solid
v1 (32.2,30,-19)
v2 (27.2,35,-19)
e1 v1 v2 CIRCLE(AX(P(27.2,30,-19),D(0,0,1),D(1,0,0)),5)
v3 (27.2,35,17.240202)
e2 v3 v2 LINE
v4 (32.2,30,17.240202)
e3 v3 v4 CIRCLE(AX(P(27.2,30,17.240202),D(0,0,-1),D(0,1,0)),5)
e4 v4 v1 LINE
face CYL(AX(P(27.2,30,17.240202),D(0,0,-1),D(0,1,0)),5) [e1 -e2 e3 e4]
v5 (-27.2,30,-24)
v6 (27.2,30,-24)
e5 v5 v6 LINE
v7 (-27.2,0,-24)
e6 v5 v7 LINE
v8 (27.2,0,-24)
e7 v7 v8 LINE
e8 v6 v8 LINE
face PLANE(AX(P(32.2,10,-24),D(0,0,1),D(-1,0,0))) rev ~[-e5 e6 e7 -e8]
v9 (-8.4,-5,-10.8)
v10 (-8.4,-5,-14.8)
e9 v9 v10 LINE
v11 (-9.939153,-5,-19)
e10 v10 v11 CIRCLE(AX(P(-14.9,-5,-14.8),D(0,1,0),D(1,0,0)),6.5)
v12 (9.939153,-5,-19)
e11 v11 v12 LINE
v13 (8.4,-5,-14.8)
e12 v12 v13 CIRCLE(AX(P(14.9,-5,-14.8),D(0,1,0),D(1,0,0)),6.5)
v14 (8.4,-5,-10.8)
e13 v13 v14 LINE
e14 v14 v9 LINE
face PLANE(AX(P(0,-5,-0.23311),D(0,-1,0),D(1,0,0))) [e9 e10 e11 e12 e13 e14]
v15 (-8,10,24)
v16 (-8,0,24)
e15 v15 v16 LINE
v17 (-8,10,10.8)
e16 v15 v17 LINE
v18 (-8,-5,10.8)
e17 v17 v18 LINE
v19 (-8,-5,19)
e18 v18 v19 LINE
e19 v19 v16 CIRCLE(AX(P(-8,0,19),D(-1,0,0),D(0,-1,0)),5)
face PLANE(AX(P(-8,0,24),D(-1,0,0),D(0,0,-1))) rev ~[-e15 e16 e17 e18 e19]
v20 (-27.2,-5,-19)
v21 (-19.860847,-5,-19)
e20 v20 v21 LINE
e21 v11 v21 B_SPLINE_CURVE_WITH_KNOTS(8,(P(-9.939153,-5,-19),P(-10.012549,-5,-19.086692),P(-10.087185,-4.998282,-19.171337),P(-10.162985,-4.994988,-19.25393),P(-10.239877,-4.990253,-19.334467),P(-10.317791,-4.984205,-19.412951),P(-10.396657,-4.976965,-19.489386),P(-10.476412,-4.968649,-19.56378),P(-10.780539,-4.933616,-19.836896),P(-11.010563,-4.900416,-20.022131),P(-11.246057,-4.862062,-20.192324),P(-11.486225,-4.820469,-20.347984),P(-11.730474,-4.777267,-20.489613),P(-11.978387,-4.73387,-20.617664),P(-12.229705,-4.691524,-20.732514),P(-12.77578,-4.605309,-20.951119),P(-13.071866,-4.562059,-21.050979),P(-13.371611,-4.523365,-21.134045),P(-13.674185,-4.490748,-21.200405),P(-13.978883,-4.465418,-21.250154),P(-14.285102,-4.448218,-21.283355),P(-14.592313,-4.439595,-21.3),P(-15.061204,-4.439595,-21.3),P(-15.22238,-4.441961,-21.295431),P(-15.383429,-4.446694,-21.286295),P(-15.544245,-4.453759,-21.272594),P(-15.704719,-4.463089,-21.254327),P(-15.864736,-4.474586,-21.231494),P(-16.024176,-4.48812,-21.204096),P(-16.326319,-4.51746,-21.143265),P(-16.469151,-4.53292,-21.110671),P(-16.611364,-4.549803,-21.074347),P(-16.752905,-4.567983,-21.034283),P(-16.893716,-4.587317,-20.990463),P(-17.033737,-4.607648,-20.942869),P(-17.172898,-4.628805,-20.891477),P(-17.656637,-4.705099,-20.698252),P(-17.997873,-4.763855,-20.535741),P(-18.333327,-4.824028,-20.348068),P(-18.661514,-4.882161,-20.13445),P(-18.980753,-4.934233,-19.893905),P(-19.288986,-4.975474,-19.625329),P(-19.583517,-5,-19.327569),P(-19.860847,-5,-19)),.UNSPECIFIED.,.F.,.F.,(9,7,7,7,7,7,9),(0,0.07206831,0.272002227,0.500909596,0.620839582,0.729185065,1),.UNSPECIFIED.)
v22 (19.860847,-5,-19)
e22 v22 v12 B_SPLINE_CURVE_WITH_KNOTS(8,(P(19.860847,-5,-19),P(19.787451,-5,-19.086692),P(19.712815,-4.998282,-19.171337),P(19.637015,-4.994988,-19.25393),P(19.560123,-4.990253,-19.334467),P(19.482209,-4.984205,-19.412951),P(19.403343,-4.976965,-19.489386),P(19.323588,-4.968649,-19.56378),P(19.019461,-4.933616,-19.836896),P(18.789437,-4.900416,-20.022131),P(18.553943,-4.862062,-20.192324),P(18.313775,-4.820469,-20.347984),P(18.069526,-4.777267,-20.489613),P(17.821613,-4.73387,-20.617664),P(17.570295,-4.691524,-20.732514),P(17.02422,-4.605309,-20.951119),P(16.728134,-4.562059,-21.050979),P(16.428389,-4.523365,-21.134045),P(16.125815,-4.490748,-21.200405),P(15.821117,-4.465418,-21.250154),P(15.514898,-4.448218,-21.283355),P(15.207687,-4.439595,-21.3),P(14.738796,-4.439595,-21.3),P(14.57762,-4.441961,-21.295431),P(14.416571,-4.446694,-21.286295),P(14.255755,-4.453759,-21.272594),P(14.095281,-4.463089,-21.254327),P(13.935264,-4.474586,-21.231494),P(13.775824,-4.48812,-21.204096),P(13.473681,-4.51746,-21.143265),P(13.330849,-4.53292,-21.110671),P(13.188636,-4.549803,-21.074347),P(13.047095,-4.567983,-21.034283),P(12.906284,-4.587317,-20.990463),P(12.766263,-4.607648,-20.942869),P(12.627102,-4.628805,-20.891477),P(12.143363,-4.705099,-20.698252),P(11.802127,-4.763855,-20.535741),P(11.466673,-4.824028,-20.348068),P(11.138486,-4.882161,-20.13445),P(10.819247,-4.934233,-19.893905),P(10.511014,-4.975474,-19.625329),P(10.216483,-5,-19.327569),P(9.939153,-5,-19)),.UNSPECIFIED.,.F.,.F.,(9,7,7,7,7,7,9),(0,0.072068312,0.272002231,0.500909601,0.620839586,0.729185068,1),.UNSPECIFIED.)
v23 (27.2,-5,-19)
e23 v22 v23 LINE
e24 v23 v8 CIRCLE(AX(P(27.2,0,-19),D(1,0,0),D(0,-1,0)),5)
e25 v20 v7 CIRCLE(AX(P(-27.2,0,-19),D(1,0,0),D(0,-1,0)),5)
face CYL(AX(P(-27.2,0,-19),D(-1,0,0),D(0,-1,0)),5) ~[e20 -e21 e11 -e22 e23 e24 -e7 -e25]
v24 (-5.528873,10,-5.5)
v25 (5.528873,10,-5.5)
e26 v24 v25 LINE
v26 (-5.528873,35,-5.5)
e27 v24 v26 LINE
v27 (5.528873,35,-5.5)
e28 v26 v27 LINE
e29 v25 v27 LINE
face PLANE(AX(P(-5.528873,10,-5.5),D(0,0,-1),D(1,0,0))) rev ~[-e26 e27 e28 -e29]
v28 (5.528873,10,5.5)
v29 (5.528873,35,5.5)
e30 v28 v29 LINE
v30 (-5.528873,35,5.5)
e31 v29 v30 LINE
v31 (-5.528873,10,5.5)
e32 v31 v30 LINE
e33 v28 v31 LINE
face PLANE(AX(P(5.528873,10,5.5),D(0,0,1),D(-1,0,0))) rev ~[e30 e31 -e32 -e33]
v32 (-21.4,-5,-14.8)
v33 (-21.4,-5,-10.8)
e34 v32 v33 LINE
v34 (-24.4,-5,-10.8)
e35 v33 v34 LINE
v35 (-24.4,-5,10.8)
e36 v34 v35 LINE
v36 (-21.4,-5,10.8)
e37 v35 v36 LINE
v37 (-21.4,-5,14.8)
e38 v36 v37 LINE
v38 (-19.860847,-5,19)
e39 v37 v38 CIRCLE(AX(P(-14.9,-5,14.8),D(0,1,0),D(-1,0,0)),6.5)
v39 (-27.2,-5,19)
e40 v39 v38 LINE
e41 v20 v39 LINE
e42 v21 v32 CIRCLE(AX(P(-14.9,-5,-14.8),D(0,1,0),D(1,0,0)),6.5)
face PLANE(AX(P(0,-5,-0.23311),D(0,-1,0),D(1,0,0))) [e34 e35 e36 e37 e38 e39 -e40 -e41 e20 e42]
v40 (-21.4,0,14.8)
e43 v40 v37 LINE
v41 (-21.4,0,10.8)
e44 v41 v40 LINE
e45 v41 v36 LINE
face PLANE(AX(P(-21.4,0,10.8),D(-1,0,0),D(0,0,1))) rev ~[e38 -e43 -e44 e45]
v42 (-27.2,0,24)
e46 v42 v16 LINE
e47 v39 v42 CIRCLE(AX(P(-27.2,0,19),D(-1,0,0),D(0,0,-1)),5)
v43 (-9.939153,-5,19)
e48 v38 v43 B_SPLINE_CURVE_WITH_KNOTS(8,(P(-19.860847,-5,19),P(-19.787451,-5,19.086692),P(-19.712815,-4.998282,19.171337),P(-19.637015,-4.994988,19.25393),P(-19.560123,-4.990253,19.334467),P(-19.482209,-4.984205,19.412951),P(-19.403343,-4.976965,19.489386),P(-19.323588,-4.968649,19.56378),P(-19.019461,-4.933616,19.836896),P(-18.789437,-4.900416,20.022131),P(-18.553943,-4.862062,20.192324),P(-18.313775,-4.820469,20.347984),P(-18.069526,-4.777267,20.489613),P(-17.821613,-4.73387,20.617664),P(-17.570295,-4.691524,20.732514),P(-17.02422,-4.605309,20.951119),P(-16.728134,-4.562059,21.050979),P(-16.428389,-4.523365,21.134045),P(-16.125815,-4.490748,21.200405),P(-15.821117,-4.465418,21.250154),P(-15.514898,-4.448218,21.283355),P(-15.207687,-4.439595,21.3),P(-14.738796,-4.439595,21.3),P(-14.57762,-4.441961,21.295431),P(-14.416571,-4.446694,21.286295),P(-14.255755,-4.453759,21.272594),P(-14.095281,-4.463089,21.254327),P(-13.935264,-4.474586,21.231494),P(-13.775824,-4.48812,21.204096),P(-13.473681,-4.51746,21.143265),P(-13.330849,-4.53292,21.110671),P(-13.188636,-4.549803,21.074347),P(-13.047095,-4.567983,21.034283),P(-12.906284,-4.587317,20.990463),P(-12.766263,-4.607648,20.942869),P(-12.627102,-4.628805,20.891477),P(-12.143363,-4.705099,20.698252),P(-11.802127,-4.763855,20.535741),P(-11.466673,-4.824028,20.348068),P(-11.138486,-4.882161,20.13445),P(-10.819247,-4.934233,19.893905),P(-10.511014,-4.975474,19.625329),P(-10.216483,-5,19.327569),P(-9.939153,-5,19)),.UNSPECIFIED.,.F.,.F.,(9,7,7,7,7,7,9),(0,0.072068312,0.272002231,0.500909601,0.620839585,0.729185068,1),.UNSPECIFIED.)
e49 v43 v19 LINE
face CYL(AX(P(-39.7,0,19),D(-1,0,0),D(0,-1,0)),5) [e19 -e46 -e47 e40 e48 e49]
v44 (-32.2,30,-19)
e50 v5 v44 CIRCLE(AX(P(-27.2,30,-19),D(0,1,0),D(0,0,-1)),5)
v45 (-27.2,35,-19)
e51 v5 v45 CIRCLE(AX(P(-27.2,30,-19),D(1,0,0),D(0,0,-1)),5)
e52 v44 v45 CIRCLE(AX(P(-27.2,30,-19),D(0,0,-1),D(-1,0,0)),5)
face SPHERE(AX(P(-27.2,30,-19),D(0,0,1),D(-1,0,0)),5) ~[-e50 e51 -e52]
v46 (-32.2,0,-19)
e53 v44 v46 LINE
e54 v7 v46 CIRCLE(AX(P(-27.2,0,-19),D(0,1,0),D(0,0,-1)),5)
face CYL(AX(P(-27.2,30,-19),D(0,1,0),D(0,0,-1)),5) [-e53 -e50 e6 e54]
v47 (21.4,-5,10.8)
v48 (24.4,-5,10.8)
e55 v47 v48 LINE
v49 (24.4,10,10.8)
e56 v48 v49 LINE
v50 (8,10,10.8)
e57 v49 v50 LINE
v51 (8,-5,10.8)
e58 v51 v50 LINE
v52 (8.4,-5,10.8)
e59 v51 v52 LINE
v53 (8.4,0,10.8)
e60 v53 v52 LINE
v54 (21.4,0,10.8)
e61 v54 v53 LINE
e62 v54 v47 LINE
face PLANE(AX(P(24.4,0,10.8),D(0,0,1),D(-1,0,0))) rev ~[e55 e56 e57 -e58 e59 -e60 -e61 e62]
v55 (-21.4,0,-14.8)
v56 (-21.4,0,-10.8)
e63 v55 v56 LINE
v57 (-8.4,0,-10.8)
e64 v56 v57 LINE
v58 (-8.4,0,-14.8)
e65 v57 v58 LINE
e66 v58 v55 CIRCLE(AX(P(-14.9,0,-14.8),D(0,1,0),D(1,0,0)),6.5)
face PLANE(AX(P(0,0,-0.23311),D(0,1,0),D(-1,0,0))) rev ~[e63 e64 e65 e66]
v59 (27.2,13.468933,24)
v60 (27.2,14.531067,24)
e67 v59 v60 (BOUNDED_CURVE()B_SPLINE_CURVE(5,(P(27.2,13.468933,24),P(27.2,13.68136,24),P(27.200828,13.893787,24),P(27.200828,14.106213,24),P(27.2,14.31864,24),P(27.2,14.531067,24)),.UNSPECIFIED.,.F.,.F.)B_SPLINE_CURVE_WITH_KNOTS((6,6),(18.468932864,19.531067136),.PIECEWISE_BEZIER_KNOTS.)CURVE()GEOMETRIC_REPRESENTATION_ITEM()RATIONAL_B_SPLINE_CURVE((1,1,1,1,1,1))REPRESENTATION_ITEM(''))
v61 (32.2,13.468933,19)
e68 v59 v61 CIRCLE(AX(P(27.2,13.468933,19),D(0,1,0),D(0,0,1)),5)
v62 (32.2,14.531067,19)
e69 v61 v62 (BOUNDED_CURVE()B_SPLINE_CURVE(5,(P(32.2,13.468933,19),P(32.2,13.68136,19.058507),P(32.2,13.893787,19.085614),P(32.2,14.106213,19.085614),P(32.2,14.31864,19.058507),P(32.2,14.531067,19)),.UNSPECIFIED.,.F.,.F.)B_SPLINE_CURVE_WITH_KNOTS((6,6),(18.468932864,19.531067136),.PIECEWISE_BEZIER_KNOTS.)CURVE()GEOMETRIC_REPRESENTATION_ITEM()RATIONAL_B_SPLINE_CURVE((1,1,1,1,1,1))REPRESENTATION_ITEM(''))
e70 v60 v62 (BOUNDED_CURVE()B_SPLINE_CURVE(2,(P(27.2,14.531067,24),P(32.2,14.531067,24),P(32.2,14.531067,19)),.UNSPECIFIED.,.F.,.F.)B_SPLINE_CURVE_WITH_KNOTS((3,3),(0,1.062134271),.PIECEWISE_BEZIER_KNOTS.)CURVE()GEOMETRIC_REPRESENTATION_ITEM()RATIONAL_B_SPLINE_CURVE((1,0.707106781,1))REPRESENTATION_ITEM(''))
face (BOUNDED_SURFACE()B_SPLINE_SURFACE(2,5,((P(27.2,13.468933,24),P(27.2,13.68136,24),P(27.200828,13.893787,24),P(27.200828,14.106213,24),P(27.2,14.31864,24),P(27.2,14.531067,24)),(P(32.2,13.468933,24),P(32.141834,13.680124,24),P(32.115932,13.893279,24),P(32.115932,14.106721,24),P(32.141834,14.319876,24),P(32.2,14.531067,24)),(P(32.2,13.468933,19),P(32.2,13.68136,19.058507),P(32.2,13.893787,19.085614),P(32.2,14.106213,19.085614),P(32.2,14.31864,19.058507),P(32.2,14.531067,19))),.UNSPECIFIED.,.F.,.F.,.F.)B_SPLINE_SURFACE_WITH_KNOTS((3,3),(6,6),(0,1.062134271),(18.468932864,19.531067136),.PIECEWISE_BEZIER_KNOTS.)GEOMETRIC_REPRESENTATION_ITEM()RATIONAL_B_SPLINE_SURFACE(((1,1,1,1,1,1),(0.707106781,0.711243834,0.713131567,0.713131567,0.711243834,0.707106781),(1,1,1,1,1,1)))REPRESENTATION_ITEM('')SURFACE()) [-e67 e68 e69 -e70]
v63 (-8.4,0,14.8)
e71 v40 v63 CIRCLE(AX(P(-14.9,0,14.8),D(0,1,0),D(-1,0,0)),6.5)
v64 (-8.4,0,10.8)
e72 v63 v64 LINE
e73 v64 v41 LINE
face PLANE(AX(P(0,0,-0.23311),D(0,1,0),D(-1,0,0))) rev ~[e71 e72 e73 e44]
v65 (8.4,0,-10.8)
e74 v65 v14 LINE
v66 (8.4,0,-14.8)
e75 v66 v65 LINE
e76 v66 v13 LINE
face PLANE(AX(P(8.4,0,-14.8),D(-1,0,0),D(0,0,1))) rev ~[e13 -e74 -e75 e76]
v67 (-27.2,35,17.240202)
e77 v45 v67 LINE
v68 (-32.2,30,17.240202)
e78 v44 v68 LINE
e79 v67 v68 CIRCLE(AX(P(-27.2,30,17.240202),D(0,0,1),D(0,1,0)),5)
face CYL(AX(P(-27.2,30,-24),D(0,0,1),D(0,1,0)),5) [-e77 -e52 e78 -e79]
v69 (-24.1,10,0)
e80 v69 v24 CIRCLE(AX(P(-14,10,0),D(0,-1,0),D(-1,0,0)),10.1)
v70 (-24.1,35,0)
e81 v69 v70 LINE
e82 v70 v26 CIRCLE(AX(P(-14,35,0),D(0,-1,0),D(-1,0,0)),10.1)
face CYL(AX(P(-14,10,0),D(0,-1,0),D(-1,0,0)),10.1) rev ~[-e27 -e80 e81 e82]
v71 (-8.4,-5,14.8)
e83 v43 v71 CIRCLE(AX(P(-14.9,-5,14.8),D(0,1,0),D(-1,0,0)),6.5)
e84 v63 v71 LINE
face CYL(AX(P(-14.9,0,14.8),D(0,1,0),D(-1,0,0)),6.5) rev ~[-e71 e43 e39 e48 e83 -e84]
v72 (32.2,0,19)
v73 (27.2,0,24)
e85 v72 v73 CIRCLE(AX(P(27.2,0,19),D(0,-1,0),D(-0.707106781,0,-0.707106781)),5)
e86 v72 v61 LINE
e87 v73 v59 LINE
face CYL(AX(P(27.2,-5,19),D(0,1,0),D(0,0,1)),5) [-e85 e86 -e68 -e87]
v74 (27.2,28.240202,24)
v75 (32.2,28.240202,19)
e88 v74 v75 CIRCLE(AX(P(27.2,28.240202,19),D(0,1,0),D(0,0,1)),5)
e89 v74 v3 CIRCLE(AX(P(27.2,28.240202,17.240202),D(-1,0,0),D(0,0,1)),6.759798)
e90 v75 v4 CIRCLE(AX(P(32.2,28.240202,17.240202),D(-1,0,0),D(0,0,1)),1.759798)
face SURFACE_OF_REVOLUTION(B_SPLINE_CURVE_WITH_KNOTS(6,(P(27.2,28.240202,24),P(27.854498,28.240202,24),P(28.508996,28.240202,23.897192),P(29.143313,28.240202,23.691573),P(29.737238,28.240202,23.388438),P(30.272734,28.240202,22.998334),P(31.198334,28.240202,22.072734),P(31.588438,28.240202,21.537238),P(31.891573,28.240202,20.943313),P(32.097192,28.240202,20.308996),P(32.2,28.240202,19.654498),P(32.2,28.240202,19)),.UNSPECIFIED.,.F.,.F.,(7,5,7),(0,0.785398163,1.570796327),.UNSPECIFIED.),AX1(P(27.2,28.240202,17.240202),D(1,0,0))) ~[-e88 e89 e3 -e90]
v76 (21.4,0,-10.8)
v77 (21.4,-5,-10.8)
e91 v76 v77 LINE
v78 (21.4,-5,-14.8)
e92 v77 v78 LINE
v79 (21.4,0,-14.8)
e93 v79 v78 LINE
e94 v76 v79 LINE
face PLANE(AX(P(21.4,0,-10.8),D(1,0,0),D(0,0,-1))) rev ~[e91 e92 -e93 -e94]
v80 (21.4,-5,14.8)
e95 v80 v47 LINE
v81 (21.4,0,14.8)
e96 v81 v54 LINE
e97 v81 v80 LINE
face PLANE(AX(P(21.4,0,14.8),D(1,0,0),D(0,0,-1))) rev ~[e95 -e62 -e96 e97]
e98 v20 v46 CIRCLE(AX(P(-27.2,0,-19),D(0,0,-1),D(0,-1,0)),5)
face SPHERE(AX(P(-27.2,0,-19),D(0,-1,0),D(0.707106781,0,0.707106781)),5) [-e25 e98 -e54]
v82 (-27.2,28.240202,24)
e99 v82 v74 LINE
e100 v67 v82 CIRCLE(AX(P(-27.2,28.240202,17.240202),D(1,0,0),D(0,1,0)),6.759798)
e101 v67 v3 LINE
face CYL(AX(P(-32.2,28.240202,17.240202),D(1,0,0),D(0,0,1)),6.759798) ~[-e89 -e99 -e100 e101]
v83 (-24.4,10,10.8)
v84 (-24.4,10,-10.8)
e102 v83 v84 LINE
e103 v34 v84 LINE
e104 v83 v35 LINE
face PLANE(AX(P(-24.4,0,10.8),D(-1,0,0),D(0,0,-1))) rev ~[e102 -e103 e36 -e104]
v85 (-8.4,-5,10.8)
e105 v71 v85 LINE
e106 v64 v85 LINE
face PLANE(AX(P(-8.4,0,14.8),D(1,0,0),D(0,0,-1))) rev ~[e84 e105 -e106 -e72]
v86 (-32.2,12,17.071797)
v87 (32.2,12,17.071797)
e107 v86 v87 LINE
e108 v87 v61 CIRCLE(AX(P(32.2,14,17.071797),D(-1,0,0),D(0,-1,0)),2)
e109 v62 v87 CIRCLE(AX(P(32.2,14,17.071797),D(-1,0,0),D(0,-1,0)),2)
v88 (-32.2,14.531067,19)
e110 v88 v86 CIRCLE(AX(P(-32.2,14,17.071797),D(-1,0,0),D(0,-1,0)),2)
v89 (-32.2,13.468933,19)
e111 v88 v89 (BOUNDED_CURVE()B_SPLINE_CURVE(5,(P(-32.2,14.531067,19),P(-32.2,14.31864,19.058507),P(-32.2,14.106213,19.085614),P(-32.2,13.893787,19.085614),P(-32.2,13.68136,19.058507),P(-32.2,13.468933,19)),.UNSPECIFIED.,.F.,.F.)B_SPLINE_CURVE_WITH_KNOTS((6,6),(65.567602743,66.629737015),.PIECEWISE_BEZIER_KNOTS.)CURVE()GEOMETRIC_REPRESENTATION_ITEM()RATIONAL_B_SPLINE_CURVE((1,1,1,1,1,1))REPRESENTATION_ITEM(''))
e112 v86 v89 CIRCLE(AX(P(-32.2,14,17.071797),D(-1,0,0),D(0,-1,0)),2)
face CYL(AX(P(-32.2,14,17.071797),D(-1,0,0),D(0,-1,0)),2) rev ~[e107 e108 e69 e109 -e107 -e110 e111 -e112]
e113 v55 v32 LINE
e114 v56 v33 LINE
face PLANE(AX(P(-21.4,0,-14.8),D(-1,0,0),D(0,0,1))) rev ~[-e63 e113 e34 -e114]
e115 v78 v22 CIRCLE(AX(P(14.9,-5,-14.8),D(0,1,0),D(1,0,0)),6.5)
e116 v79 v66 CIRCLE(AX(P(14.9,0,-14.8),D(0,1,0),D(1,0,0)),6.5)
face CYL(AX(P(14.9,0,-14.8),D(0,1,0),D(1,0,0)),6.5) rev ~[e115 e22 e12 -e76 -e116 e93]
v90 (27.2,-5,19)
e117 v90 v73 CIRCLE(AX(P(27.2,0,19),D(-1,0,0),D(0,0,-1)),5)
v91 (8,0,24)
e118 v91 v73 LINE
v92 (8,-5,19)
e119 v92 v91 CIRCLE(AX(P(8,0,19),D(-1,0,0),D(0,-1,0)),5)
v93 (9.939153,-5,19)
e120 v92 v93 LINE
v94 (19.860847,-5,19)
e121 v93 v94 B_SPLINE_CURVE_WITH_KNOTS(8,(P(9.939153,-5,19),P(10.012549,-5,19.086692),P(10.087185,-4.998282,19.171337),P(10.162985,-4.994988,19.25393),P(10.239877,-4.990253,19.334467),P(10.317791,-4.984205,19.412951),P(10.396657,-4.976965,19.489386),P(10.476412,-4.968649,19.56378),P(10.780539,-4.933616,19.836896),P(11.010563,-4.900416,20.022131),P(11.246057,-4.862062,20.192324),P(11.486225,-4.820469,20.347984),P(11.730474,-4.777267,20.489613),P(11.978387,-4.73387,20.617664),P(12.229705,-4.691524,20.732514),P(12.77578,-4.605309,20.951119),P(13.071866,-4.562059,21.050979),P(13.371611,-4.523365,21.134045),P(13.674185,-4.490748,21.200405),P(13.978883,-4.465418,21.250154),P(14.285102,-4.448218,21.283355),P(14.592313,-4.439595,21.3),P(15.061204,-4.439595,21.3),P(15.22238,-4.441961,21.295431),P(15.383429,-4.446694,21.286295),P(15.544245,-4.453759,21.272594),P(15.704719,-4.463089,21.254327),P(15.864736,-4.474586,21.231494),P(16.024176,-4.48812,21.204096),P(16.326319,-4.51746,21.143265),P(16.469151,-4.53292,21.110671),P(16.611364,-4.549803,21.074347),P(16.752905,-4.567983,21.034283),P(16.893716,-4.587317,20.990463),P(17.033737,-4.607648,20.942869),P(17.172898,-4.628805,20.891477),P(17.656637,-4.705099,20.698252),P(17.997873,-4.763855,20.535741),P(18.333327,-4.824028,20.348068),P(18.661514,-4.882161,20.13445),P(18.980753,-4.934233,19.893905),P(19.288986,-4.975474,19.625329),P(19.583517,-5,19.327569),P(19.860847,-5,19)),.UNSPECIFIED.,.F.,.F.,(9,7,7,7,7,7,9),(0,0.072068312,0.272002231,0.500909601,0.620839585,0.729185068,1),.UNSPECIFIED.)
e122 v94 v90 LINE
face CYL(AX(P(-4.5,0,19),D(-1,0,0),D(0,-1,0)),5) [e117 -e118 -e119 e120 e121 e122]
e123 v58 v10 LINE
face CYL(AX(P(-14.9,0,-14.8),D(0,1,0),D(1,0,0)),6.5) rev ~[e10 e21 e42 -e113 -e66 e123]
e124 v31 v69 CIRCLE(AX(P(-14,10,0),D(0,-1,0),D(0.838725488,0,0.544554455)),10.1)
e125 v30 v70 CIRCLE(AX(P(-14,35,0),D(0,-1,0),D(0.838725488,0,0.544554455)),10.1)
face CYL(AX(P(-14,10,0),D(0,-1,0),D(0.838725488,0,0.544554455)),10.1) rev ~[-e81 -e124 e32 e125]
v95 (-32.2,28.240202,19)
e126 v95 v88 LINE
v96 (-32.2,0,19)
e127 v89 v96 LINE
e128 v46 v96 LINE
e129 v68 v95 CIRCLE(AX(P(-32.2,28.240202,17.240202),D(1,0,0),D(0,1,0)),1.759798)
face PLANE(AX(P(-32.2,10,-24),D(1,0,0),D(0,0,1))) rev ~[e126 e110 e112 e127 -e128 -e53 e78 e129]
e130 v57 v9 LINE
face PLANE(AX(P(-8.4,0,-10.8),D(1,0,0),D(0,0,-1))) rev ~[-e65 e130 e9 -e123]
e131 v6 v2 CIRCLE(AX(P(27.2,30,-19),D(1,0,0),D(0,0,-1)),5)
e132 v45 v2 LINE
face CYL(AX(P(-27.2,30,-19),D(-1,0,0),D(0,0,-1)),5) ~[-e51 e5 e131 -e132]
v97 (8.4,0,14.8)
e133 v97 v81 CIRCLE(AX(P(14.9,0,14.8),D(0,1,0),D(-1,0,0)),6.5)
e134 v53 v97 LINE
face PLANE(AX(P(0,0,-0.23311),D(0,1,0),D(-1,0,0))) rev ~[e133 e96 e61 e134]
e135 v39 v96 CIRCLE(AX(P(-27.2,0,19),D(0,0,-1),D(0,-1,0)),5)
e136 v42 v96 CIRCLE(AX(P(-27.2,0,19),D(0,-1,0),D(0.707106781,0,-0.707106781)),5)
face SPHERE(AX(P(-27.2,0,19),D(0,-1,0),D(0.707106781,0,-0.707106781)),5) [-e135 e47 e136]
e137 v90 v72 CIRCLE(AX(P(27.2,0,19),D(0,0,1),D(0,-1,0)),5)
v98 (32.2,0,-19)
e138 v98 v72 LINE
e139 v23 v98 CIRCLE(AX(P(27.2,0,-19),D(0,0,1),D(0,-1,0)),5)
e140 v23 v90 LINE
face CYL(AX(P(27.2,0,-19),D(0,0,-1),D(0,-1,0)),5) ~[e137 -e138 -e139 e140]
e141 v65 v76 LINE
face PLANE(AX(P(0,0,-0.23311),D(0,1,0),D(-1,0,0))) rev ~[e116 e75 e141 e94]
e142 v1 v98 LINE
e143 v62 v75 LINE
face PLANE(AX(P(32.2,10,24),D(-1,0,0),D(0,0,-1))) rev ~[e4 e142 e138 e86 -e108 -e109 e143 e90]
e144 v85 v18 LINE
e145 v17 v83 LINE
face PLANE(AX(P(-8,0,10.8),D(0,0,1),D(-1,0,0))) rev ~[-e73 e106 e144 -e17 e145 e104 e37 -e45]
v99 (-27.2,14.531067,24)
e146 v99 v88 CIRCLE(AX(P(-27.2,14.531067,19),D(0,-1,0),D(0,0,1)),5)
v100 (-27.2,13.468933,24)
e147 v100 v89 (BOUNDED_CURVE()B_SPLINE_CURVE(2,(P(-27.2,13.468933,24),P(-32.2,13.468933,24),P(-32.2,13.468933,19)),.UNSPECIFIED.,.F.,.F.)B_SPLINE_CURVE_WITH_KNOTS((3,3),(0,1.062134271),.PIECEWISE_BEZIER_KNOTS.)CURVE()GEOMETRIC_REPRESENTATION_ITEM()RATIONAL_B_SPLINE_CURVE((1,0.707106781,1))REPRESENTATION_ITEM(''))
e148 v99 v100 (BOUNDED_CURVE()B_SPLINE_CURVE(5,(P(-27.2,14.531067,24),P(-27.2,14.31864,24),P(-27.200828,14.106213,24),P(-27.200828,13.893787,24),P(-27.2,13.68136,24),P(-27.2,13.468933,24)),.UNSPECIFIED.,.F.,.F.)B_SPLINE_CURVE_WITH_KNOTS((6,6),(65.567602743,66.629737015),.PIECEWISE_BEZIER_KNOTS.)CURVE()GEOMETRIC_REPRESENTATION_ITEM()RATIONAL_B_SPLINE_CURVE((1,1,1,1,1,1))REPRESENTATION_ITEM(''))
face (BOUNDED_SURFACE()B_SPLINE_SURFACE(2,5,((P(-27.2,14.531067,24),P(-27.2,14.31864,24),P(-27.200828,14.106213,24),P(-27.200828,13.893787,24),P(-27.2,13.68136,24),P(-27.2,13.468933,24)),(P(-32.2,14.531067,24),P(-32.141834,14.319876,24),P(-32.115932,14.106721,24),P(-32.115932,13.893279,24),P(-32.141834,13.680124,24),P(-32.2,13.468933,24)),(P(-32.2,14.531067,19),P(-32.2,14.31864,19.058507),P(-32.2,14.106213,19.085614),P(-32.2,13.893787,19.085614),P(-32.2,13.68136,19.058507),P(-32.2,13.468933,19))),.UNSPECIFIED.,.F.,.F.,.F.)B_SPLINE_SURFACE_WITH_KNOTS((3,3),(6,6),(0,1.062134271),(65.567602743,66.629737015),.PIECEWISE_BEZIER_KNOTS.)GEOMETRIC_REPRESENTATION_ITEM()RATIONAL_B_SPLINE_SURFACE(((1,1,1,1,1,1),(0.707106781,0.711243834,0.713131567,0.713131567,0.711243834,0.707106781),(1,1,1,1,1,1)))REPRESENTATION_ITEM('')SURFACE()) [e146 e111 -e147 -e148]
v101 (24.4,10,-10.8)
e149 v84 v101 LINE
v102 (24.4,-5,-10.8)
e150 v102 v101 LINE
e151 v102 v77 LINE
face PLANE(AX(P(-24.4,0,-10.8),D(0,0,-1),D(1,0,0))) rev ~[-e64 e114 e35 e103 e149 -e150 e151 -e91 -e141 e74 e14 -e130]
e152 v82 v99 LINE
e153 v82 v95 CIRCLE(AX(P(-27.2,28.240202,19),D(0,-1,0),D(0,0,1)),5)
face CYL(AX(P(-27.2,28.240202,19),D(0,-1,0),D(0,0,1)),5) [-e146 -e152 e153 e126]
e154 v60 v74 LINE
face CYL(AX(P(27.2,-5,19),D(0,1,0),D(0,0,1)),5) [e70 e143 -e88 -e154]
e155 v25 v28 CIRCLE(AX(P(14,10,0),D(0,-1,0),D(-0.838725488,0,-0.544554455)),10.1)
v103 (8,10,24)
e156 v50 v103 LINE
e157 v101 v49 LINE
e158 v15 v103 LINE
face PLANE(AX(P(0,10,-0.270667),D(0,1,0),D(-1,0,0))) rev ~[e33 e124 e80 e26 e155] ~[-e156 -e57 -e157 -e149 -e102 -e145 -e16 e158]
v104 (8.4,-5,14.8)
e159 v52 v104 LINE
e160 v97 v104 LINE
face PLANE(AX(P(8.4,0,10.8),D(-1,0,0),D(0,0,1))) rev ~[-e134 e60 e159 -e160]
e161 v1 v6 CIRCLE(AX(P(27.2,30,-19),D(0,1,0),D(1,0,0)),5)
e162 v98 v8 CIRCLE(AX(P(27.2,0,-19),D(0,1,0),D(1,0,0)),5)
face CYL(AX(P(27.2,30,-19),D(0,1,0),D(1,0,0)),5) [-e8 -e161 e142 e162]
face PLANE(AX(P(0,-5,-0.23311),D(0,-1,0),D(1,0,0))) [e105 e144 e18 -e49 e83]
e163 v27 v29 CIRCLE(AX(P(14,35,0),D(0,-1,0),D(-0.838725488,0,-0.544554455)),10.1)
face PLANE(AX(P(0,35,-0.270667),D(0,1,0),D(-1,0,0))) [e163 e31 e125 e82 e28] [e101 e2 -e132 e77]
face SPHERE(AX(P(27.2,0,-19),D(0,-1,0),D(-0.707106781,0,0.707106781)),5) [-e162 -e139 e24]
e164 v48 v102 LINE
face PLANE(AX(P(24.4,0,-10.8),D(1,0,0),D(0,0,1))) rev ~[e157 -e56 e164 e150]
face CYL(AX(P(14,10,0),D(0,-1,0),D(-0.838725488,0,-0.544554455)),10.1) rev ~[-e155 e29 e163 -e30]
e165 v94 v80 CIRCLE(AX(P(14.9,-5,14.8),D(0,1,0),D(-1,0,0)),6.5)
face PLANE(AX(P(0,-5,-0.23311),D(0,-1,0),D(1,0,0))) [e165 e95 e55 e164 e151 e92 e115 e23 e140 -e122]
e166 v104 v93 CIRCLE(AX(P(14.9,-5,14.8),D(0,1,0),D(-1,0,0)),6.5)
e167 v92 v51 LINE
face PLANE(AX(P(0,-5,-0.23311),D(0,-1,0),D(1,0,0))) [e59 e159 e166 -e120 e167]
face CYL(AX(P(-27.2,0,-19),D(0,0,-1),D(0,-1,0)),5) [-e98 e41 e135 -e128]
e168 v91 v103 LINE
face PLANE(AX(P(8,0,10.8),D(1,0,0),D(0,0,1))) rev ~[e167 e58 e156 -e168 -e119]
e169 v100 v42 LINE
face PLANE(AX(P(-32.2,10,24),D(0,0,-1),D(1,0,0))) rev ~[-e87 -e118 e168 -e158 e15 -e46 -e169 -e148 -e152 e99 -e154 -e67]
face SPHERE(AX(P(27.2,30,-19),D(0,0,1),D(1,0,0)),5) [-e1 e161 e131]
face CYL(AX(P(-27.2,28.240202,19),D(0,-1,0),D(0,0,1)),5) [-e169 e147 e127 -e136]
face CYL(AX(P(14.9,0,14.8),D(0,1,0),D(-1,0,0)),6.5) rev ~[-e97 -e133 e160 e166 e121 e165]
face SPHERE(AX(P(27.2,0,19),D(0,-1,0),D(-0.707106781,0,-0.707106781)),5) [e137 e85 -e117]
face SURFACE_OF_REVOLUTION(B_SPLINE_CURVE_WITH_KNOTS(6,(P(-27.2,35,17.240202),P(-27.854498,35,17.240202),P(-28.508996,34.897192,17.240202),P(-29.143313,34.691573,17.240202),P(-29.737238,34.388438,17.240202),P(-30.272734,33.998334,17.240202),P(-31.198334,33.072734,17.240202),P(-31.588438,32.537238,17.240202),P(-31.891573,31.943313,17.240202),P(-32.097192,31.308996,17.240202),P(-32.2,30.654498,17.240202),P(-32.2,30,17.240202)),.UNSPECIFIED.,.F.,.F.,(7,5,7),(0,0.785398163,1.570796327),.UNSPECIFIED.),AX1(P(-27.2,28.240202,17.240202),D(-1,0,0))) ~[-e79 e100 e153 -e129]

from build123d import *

# Parameters (mm, degrees)
F1_DEPTH      = 5
F3_DEPTH      = 10
F5_DEPTH      = 25
F7_R          = 6.7597979746
F6_R          = 2
F8_DEPTH      = 69.4
F9_R          = 5
F10_R         = 5
F11_T1_DEPTH  = 44.2
F11_T3_DEPTH  = 44.2
F12_T1_DEPTH  = 54.4
F12_T3_DEPTH  = 30
F12_T5_DEPTH  = 38
F12_S9_W      = 5
F12_S9_H      = 5
F12_T10_DEPTH = 5
F12_S15_W     = 5
F12_S15_H     = 5
F12_T16_DEPTH = 5
F12_S21_W     = 5
F12_S21_H     = 5
F12_T22_DEPTH = 5
F12_S27_W     = 5
F12_S27_H     = 5
F12_T28_DEPTH = 5
F12_T32_ANGLE = 90
F12_T34_ANGLE = 90


# Not quite as in the source:
# - a fillet or chamfer that OpenCascade refuses, or shapes differently, is made with other operations: its cross-section is extruded or revolved along the edge and cut away or added


with BuildPart() as f1:
    # F0 (on Front) → F1 (new body)
    with BuildSketch(Plane.XZ):
        with BuildLine():
            Line((32.2, -24), (32.2, 24))
            Line((32.2, 24), (8, 24))
            Line((8, 24), (8, 10.8))
            Line((8, 10.8), (8.4, 10.8))
            Line((8.4, 10.8), (8.4, 14.8))
            ThreePointArc((8.4, 14.8), (14.9, 21.3), (21.4, 14.8))
            Line((21.4, 14.8), (21.4, 10.8))
            Line((21.4, 10.8), (24.4, 10.8))
            Line((24.4, 10.8), (24.4, -10.8))
            Line((24.4, -10.8), (21.4, -10.8))
            Line((21.4, -10.8), (21.4, -14.8))
            ThreePointArc((21.4, -14.8), (14.9, -21.3), (8.4, -14.8))
            Line((8.4, -14.8), (8.4, -10.8))
            Line((8.4, -10.8), (-8.4, -10.8))
            Line((-8.4, -10.8), (-8.4, -14.8))
            ThreePointArc((-8.4, -14.8), (-14.9, -21.3), (-21.4, -14.8))
            Line((-21.4, -14.8), (-21.4, -10.8))
            Line((-21.4, -10.8), (-24.4, -10.8))
            Line((-24.4, -10.8), (-24.4, 10.8))
            Line((-24.4, 10.8), (-21.4, 10.8))
            Line((-21.4, 10.8), (-21.4, 14.8))
            ThreePointArc((-21.4, 14.8), (-14.9, 21.3), (-8.4, 14.8))
            Line((-8.4, 14.8), (-8.4, 10.8))
            Line((-8.4, 10.8), (-8, 10.8))
            Line((-8, 10.8), (-8, 24))
            Line((-8, 24), (-32.2, 24))
            Line((-32.2, 24), (-32.2, -24))
            Line((-32.2, -24), (32.2, -24))
        make_face()
    extrude(amount=F1_DEPTH)

    # F2 (on face) → F3 (join)
    with BuildSketch(Plane(origin=(0, 0, 0), x_dir=(-1, 0, 0), z_dir=(0, 1, 0))):
        with BuildLine():
            Line((24.4, 10.8), (24.4, -10.8))
            Line((24.4, -10.8), (21.4, -10.8))
            Line((21.4, -10.8), (21.4, -14.8))
            ThreePointArc((21.4, -14.8), (14.9, -21.3), (8.4, -14.8))
            Line((8.4, -14.8), (8.4, -10.8))
            Line((8.4, -10.8), (-8.4, -10.8))
            Line((-8.4, -10.8), (-8.4, -14.8))
            ThreePointArc((-8.4, -14.8), (-14.9, -21.3), (-21.4, -14.8))
            Line((-21.4, -14.8), (-21.4, -10.8))
            Line((-21.4, -10.8), (-24.4, -10.8))
            Line((-24.4, -10.8), (-24.4, 10.8))
            Line((-24.4, 10.8), (-21.4, 10.8))
            Line((-21.4, 10.8), (-21.4, 14.8))
            ThreePointArc((-21.4, 14.8), (-14.9, 21.3), (-8.4, 14.8))
            Line((-8.4, 14.8), (-8.4, 10.8))
            Line((-8.4, 10.8), (-8, 10.8))
            Line((-8, 10.8), (-8, 24))
            Line((-8, 24), (-32.2, 24))
            Line((-32.2, 24), (-32.2, -24))
            Line((-32.2, -24), (32.2, -24))
            Line((32.2, -24), (32.2, 24))
            Line((32.2, 24), (8, 24))
            Line((8, 24), (8, 10.8))
            Line((8, 10.8), (8.4, 10.8))
            Line((8.4, 10.8), (8.4, 14.8))
            ThreePointArc((8.4, 14.8), (14.9, 21.3), (21.4, 14.8))
            Line((21.4, 14.8), (21.4, 10.8))
            Line((21.4, 10.8), (24.4, 10.8))
        make_face()
        with BuildLine():
            Line((21.4, -14.8), (21.4, -10.8))
            Line((21.4, -10.8), (8.4, -10.8))
            Line((8.4, -10.8), (8.4, -14.8))
            ThreePointArc((8.4, -14.8), (14.9, -21.3), (21.4, -14.8))
        make_face()
        with BuildLine():
            Line((-8.4, -14.8), (-8.4, -10.8))
            Line((-8.4, -10.8), (-21.4, -10.8))
            Line((-21.4, -10.8), (-21.4, -14.8))
            ThreePointArc((-21.4, -14.8), (-14.9, -21.3), (-8.4, -14.8))
        make_face()
        with BuildLine():
            Line((8.4, 10.8), (21.4, 10.8))
            Line((21.4, 10.8), (21.4, 14.8))
            ThreePointArc((21.4, 14.8), (14.9, 21.3), (8.4, 14.8))
            Line((8.4, 14.8), (8.4, 10.8))
        make_face()
        with BuildLine():
            Line((-21.4, 10.8), (-8.4, 10.8))
            Line((-8.4, 10.8), (-8.4, 14.8))
            ThreePointArc((-8.4, 14.8), (-14.9, 21.3), (-21.4, 14.8))
            Line((-21.4, 14.8), (-21.4, 10.8))
        make_face()
    extrude(amount=F3_DEPTH)

    # F4 (on face) → F5 (join)
    with BuildSketch(Plane(origin=(0, 10, 0), x_dir=(-1, 0, 0), z_dir=(0, 1, 0))):
        Polygon((32.2, -24), (32.2, 24), (8, 24), (8, 10.8), (24.4, 10.8), (24.4, -10.8), (-24.4, -10.8), (-24.4, 10.8), (-8, 10.8), (-8, 24), (-32.2, 24), (-32.2, -24), align=None)
        Polygon((8, 10.8), (8, 24), (-8, 24), (-8, 10.8), (-24.4, 10.8), (-24.4, -10.8), (24.4, -10.8), (24.4, 10.8), align=None)
        with BuildLine():
            ThreePointArc((5.5288725662, 5.5), (16.8680666762, 9.6842239514), (24.1, 0))
            ThreePointArc((24.1, 0), (16.8680666762, -9.6842239514), (5.5288725662, -5.5))
            Line((5.5288725662, -5.5), (0, -5.5))
            Line((0, -5.5), (-5.5288725662, -5.5))
            ThreePointArc((-5.5288725662, -5.5), (-24.1, 0), (-5.5288725662, 5.5))
            Line((-5.5288725662, 5.5), (0, 5.5))
            Line((0, 5.5), (5.5288725662, 5.5))
        make_face(mode=Mode.SUBTRACT)
    extrude(amount=F5_DEPTH)

    # F7
    f7_edges = [f1.edges().sort_by_distance(p)[0] for p in [
        (0, 35, 24),
    ]]
    fillet(f7_edges, radius=F7_R)

    # F6 (on face) → F8 (cut)
    with BuildSketch(Plane(origin=(-32.2, 0, 0), x_dir=(0, -1, 0), z_dir=(-1, 0, 0))):
        with Locations((-14, 17.0717967697)):
            Circle(F6_R)
    extrude(amount=-F8_DEPTH, mode=Mode.SUBTRACT)

    # F9
    f9_edges = [f1.edges().sort_by_distance(p)[0] for p in [
        (32.2, 33.020101, 22.020101),
        (32.2, 35, -3.379899),
    ]]
    fillet(f9_edges, radius=F9_R)

    # F10
    f10_edges = [f1.edges().sort_by_distance(p)[0] for p in [
        (-32.2, 35, -3.379899),
    ]]
    fillet(f10_edges, radius=F10_R)

    # F11: fillet of radius 5 on 2 edges, made by hand

    # F11_s2 → F11_t1 (cut)
    with BuildSketch(Plane.YZ.offset(-39.7)):
        with BuildLine():
            ThreePointArc((-5, 19), (-3.5355339059, 22.5355339059), (0, 24))
            Line((0, 24), (-5, 24))
            Line((-5, 24), (-5, 19))
        make_face()
    extrude(amount=F11_T1_DEPTH, mode=Mode.SUBTRACT)

    # F11_s4 → F11_t3 (cut)
    with BuildSketch(Plane.YZ.offset(-4.5)):
        with BuildLine():
            ThreePointArc((-5, 19), (-3.5355339059, 22.5355339059), (0, 24))
            Line((0, 24), (-5, 24))
            Line((-5, 24), (-5, 19))
        make_face()
    extrude(amount=F11_T3_DEPTH, mode=Mode.SUBTRACT)

    # F12: fillet of radius 5 on 8 edges, made by hand

    # F12_s2 → F12_t1 (cut)
    with BuildSketch(Plane.YZ.offset(-27.2)):
        with BuildLine():
            ThreePointArc((30, -24), (33.5355339059, -22.5355339059), (35, -19))
            Line((35, -19), (35, -24))
            Line((35, -24), (30, -24))
        make_face()
        with BuildLine():
            ThreePointArc((-5, -19), (-3.5355339059, -22.5355339059), (0, -24))
            Line((0, -24), (-5, -24))
            Line((-5, -24), (-5, -19))
        make_face()
    extrude(amount=F12_T1_DEPTH, mode=Mode.SUBTRACT)

    # F12_s4 → F12_t3 (cut)
    with BuildSketch(Plane.XZ.offset(-30)):
        with BuildLine():
            ThreePointArc((-27.2, -24), (-30.7355339059, -22.5355339059), (-32.2, -19))
            Line((-32.2, -19), (-32.2, -24))
            Line((-32.2, -24), (-27.2, -24))
        make_face()
        with BuildLine():
            ThreePointArc((32.2, -19), (30.7355339059, -22.5355339059), (27.2, -24))
            Line((27.2, -24), (32.2, -24))
            Line((32.2, -24), (32.2, -19))
        make_face()
    extrude(amount=F12_T3_DEPTH, mode=Mode.SUBTRACT)

    # F12_s6 → F12_t5 (cut)
    with BuildSketch(Plane.XY.offset(-19)):
        with BuildLine():
            ThreePointArc((27.2, -5), (30.7355339059, -3.5355339059), (32.2, 0))
            Line((32.2, 0), (32.2, -5))
            Line((32.2, -5), (27.2, -5))
        make_face()
        with BuildLine():
            ThreePointArc((-27.2, -5), (-30.7355339059, -3.5355339059), (-32.2, 0))
            Line((-32.2, 0), (-32.2, -5))
            Line((-32.2, -5), (-27.2, -5))
        make_face()
    extrude(amount=F12_T5_DEPTH, mode=Mode.SUBTRACT)


with BuildPart() as f12_tool8:
    # F12_s9 → F12_t10 (new body)
    with BuildSketch(Plane.XZ):
        with Locations((-29.7, 21.5)):
            Rectangle(F12_S9_W, F12_S9_H)
    extrude(amount=F12_T10_DEPTH)

    # F12_s11 → F12_t12 (revolve, cut)
    with BuildSketch(Plane(origin=(-27.2, 0, 19), x_dir=(0.7071067812, 0, -0.7071067812), z_dir=(-0.7071067812, 0, -0.7071067812))):
        with BuildLine():
            ThreePointArc((0, -5), (5, 0), (0, 5))
            Line((0, 5), (0, -5))
        make_face()
    revolve(axis=Axis((-27.2, 0, 19), (0, -1, 0)), mode=Mode.SUBTRACT)


with BuildPart() as f1_1:
    add(f1.part)

    # F12_t7: cut F12_tool8
    add(f12_tool8.part, mode=Mode.SUBTRACT)


with BuildPart() as f12_tool14:
    # F12_s15 → F12_t16 (new body)
    with BuildSketch(Plane.XZ):
        with Locations((29.7, 21.5)):
            Rectangle(F12_S15_W, F12_S15_H)
    extrude(amount=F12_T16_DEPTH)

    # F12_s17 → F12_t18 (revolve, cut)
    with BuildSketch(Plane(origin=(27.2, 0, 19), x_dir=(-0.7071067812, 0, -0.7071067812), z_dir=(-0.7071067812, 0, 0.7071067812))):
        with BuildLine():
            ThreePointArc((0, -5), (5, 0), (0, 5))
            Line((0, 5), (0, -5))
        make_face()
    revolve(axis=Axis((27.2, 0, 19), (0, -1, 0)), mode=Mode.SUBTRACT)


with BuildPart() as f1_2:
    add(f1_1.part)

    # F12_t13: cut F12_tool14
    add(f12_tool14.part, mode=Mode.SUBTRACT)


with BuildPart() as f12_tool20:
    # F12_s21 → F12_t22 (new body)
    with BuildSketch(Plane.XZ):
        with Locations((-29.7, -21.5)):
            Rectangle(F12_S21_W, F12_S21_H)
    extrude(amount=F12_T22_DEPTH)

    # F12_s23 → F12_t24 (revolve, cut)
    with BuildSketch(Plane(origin=(-27.2, 0, -19), x_dir=(0.7071067812, 0, 0.7071067812), z_dir=(0.7071067812, 0, -0.7071067812))):
        with BuildLine():
            ThreePointArc((0, -5), (5, 0), (0, 5))
            Line((0, 5), (0, -5))
        make_face()
    revolve(axis=Axis((-27.2, 0, -19), (0, -1, 0)), mode=Mode.SUBTRACT)


with BuildPart() as f1_3:
    add(f1_2.part)

    # F12_t19: cut F12_tool20
    add(f12_tool20.part, mode=Mode.SUBTRACT)


with BuildPart() as f12_tool26:
    # F12_s27 → F12_t28 (new body)
    with BuildSketch(Plane.XZ):
        with Locations((29.7, -21.5)):
            Rectangle(F12_S27_W, F12_S27_H)
    extrude(amount=F12_T28_DEPTH)

    # F12_s29 → F12_t30 (revolve, cut)
    with BuildSketch(Plane(origin=(27.2, 0, -19), x_dir=(-0.7071067812, 0, 0.7071067812), z_dir=(0.7071067812, 0, 0.7071067812))):
        with BuildLine():
            ThreePointArc((0, -5), (5, 0), (0, 5))
            Line((0, 5), (0, -5))
        make_face()
    revolve(axis=Axis((27.2, 0, -19), (0, -1, 0)), mode=Mode.SUBTRACT)


with BuildPart() as f1_4:
    add(f1_3.part)

    # F12_t25: cut F12_tool26
    add(f12_tool26.part, mode=Mode.SUBTRACT)

    # F12_s31 → F12_t32 (revolve, cut)
    with BuildSketch(Plane.XZ.offset(-30)):
        with BuildLine():
            ThreePointArc((-27.2, -24), (-30.7355339059, -22.5355339059), (-32.2, -19))
            Line((-32.2, -19), (-32.2, -24))
            Line((-32.2, -24), (-27.2, -24))
        make_face()
    revolve(axis=Axis((-27.2, 30, -24), (0, 0, -1)), revolution_arc=F12_T32_ANGLE, mode=Mode.SUBTRACT)

    # F12_s33 → F12_t34 (revolve, cut)
    with BuildSketch(Plane.XZ.offset(-30)):
        with BuildLine():
            ThreePointArc((27.2, -24), (30.7355339059, -22.5355339059), (32.2, -19))
            Line((32.2, -19), (32.2, -24))
            Line((32.2, -24), (27.2, -24))
        make_face()
    revolve(axis=Axis((27.2, 30, -24), (0, 0, 1)), revolution_arc=F12_T34_ANGLE, mode=Mode.SUBTRACT)


solid = f1_4.part
